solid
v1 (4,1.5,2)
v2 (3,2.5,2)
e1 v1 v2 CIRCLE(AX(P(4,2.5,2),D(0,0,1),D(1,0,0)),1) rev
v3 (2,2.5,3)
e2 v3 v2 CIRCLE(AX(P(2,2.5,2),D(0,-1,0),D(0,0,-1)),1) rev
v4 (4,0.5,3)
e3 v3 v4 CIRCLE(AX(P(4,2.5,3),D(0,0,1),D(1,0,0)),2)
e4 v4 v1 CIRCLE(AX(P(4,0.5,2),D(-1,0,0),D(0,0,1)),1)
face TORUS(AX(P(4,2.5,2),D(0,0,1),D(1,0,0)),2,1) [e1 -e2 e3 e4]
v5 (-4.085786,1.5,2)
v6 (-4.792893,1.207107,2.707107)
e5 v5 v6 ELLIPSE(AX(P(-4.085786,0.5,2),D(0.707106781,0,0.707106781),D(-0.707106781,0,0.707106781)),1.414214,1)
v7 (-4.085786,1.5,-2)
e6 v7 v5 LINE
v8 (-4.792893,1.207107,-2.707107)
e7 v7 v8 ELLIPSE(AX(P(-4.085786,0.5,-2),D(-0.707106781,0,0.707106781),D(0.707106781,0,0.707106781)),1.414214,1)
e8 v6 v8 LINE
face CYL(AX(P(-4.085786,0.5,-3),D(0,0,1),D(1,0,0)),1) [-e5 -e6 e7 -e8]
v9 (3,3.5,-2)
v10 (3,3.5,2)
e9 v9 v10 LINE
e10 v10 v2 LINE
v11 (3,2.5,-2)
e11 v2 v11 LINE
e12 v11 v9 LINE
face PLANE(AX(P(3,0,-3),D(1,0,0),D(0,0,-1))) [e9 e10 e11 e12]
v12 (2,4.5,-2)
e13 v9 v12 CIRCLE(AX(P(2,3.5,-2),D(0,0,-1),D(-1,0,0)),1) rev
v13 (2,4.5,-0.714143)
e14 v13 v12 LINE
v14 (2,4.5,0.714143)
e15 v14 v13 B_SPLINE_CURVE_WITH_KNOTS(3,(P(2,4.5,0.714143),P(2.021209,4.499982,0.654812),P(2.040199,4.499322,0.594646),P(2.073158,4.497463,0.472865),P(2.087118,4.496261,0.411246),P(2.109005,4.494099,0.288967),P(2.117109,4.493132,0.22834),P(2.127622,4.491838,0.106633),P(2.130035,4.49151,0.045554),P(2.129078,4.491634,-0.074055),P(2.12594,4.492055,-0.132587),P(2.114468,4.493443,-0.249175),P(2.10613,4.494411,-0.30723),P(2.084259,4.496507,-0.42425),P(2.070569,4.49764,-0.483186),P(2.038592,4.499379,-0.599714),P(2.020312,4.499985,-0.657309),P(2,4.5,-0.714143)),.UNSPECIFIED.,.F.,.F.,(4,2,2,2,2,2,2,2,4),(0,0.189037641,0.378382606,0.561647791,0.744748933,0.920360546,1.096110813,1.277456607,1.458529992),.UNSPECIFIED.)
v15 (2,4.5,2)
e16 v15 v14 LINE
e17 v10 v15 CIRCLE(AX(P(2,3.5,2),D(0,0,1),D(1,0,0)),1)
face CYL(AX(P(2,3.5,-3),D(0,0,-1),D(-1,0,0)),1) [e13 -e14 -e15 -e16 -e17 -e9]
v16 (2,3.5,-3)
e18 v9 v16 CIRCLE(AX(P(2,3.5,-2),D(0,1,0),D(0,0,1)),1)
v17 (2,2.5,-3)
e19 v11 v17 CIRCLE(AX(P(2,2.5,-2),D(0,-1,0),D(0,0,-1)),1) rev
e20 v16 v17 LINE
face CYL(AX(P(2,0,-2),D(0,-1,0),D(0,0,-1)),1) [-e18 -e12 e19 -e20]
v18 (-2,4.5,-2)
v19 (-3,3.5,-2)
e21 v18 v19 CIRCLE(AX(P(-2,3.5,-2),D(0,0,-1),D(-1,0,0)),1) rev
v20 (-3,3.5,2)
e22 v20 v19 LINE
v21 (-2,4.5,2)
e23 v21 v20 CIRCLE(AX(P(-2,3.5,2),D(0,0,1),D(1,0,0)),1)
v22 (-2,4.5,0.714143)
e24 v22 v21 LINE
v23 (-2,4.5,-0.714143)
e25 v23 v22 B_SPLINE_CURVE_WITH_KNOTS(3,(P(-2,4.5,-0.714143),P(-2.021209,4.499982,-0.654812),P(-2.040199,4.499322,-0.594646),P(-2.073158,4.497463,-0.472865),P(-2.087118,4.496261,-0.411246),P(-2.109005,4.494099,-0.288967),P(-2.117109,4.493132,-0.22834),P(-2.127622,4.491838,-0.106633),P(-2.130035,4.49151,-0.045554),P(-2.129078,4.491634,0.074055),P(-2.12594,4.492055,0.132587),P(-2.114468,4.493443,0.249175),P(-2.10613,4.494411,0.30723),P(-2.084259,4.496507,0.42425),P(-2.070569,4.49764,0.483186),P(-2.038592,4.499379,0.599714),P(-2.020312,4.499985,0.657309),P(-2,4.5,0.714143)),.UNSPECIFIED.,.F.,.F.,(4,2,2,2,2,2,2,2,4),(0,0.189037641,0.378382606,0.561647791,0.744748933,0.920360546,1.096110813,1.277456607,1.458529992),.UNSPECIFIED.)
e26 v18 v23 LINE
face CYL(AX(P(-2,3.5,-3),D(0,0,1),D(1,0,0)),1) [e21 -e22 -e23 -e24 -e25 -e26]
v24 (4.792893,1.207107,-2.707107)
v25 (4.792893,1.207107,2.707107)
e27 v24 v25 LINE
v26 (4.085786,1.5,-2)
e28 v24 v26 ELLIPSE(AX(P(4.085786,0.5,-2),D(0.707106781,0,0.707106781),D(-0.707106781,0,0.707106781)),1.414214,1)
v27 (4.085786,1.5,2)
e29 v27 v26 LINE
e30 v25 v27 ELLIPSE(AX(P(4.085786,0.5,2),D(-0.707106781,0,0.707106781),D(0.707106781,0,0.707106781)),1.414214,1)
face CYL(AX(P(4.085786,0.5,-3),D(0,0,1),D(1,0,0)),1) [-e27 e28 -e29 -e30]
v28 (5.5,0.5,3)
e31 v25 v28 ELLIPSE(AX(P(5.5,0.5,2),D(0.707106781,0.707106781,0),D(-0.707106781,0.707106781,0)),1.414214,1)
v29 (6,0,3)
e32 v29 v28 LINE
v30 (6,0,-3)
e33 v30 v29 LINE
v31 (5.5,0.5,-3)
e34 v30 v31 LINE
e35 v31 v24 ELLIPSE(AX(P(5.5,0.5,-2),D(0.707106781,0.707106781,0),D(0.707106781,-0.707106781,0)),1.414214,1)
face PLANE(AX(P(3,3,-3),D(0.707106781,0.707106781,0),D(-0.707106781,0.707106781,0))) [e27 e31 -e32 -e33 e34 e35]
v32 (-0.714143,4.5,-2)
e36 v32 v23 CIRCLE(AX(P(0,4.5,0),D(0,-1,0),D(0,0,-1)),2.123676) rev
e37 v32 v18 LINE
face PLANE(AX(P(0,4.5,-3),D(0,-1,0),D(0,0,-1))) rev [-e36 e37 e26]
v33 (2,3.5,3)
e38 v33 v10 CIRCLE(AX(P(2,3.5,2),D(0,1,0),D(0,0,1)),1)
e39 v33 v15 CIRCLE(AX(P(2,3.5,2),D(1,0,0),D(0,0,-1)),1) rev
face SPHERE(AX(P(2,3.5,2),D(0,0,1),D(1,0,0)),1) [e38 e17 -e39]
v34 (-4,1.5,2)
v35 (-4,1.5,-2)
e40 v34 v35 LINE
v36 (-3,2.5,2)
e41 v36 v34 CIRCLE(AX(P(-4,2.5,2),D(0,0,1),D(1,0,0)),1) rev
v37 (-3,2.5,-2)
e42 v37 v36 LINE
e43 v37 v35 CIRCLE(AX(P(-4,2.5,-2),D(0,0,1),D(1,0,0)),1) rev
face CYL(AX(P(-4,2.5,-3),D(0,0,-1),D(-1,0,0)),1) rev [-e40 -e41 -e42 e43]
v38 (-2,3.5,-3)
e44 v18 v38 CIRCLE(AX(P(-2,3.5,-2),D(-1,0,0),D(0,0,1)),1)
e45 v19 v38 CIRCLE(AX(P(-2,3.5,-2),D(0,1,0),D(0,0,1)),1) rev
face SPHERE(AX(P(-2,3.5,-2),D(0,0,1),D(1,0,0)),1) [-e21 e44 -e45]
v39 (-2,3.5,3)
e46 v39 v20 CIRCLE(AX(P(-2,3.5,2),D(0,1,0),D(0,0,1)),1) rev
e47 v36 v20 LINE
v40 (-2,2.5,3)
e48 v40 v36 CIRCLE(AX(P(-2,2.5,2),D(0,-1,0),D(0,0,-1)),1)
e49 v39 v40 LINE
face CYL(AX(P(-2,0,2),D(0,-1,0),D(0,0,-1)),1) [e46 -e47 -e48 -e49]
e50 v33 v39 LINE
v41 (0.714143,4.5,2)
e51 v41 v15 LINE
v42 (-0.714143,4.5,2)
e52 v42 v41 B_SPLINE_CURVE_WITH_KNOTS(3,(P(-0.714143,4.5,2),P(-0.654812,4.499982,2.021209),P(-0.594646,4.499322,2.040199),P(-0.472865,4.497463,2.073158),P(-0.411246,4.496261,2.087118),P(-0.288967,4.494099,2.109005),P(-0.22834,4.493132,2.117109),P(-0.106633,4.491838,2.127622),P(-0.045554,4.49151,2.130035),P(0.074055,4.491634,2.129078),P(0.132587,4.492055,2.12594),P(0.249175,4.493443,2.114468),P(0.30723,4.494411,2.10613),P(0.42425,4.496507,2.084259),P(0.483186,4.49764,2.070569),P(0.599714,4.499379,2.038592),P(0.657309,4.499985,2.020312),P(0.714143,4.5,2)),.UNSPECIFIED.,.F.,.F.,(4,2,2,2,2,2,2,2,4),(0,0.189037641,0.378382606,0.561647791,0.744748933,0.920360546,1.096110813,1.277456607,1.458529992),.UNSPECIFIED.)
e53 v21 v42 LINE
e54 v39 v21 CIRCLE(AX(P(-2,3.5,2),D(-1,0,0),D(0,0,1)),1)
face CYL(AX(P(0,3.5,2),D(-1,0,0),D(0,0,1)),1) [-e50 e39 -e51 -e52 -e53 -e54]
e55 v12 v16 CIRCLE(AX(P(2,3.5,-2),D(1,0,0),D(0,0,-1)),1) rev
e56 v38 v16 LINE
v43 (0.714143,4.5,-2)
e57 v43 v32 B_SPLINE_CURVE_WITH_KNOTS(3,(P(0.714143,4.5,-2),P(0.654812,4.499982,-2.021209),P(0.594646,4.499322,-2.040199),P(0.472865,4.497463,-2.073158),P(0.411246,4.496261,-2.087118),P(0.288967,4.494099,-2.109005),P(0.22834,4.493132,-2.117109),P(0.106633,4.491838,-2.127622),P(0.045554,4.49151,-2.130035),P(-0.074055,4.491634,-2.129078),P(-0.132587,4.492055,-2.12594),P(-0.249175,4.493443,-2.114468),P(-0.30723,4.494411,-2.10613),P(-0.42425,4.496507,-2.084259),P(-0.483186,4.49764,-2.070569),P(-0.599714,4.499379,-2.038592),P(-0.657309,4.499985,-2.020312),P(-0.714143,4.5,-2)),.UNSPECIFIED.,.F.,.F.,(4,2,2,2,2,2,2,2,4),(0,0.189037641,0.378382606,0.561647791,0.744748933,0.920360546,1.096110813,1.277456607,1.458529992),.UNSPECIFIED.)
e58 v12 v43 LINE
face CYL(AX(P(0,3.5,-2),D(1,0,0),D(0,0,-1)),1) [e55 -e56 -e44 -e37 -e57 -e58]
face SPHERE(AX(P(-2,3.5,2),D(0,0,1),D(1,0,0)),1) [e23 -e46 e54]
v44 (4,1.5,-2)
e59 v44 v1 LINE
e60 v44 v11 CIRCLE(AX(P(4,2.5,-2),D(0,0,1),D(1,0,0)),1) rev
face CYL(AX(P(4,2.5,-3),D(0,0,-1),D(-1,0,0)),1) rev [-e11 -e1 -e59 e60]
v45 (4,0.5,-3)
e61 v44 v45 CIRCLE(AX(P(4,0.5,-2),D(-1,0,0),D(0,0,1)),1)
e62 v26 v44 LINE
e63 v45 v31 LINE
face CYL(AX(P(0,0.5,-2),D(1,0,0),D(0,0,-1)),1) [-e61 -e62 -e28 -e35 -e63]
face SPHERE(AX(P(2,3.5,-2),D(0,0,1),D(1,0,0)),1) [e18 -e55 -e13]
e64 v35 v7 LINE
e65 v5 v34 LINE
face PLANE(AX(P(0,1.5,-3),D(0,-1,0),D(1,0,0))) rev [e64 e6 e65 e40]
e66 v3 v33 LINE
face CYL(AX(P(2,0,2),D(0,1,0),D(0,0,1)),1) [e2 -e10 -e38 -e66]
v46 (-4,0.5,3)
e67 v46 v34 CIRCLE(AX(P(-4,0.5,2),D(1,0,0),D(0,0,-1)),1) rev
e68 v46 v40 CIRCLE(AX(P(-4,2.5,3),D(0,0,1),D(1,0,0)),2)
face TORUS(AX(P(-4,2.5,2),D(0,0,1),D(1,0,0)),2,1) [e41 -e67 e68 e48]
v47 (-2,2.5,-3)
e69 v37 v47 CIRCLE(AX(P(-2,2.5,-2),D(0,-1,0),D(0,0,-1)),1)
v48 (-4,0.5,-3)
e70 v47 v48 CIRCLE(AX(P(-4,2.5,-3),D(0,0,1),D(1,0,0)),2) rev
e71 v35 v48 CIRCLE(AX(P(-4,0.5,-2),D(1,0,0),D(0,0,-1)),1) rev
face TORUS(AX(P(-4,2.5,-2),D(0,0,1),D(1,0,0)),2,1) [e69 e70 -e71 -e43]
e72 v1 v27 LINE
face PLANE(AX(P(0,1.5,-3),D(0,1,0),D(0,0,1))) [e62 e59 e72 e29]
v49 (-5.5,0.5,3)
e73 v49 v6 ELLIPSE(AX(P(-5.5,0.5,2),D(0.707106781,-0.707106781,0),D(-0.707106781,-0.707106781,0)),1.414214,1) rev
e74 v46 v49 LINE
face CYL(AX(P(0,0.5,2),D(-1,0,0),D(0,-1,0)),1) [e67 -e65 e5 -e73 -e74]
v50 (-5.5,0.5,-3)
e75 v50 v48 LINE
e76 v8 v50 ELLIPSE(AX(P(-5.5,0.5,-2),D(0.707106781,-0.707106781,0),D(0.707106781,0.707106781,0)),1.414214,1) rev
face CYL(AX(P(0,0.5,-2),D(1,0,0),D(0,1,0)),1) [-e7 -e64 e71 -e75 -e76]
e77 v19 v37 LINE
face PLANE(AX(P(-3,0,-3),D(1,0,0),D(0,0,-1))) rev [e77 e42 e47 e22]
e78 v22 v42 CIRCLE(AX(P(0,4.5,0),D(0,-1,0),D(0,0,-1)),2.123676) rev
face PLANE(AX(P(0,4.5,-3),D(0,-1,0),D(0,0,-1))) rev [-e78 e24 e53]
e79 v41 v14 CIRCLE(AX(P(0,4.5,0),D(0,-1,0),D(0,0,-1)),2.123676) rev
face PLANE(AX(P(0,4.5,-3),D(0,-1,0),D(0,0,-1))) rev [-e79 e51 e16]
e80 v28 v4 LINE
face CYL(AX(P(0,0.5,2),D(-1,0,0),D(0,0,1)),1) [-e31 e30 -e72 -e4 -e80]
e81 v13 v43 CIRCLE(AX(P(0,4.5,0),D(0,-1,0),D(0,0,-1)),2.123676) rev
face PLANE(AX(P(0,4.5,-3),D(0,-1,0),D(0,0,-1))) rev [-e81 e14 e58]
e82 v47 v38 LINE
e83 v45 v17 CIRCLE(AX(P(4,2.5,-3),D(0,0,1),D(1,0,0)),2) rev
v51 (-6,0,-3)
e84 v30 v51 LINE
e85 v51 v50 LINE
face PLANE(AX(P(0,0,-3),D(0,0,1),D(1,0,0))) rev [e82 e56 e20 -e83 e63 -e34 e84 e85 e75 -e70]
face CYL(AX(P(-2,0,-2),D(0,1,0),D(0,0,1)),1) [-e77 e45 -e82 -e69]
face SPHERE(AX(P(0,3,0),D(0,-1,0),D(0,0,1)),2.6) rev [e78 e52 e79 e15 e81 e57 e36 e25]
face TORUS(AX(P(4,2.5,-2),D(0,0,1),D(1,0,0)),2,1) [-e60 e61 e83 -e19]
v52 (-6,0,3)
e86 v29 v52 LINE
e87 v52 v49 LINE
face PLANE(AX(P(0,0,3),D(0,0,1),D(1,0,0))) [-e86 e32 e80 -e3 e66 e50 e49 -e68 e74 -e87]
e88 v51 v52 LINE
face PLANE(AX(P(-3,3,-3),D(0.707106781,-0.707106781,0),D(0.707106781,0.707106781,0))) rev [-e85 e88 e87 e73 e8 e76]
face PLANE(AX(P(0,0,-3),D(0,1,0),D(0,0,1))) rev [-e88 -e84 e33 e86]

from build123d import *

# Parameters (mm, degrees)
BOSS_EXTRUDE1_DEPTH      = 3
BOSS_EXTRUDE1_DEPTH_BACK = 3
FILLET1_R                = 1


with BuildPart() as part:
    # Sketch1 → Boss-Extrude1 (new, two sides: drawn at the far end of the back side and taken through both)
    with BuildSketch(Plane.XY.offset(-BOSS_EXTRUDE1_DEPTH_BACK)):
        Polygon((-6, 0), (0, 0), (0, 4.5), (-3, 4.5), (-3, 1.5), (-4.5, 1.5), align=None)
        Polygon((0, 0), (6, 0), (4.5, 1.5), (3, 1.5), (3, 4.5), (0, 4.5), align=None)
    extrude(amount=BOSS_EXTRUDE1_DEPTH + BOSS_EXTRUDE1_DEPTH_BACK)

    # Sketch2 → Cut-Revolve1 (revolve, cut)
    with BuildSketch(Plane(origin=(0, 0, 0), x_dir=(0, 0, -1), z_dir=(1, 0, 0))):
        with BuildLine():
            Line((0, 0.4), (0, 5.6))
            ThreePointArc((0, 5.6), (-2.6, 3), (0, 0.4))
        make_face()
    revolve(axis=Axis((0, 0.4, 0), (0, 1, 0)), mode=Mode.SUBTRACT)

    # Fillet1
    # the kernel refuses this fillet: 1 mm, written as the material it adds along each edge
    with BuildSketch(Plane(origin=(-3, 1.5, 3), x_dir=(-1, 0, 0), z_dir=(0, 0, -1)), Plane(origin=(3, 1.5, -3), x_dir=(1, 0, 0), z_dir=(0, 0, 1))) as fillet1_piece_1:
        with BuildLine():
            CenterArc((FILLET1_R, FILLET1_R), FILLET1_R, 180, 90)
            Line((0, FILLET1_R), (0, 0))
            Line((0, 0), (FILLET1_R, 0))
        make_face()
    extrude(amount=6)
    # the kernel refuses this fillet: 1 mm, written as the material it takes off along each edge
    with BuildSketch(Plane(origin=(-2, 3.5, -2), x_dir=(-1, 0, 0), z_dir=(0, 1, 0))) as fillet1_2_piece_1_section:
        Polygon((0, 0), (FILLET1_R, 0), (FILLET1_R, -FILLET1_R), (0, -FILLET1_R), align=None)
    fillet1_2_piece_1 = extrude(amount=FILLET1_R, mode=Mode.PRIVATE)
    fillet1_2_piece_1 = fillet1_2_piece_1 - Plane(origin=(-2, 3.5, -2), x_dir=(0.7071067811865475, 0, 0.7071067811865475), z_dir=(0, 1, 0)) * Sphere(FILLET1_R, mode=Mode.PRIVATE)
    add(fillet1_2_piece_1, mode=Mode.SUBTRACT)
    with BuildSketch(Plane(origin=(-2, 3.5, 2), x_dir=(-1, 0, 0), z_dir=(0, 1, 0))) as fillet1_2_piece_2_section:
        Polygon((0, 0), (FILLET1_R, 0), (FILLET1_R, FILLET1_R), (0, FILLET1_R), align=None)
    fillet1_2_piece_2 = extrude(amount=FILLET1_R, mode=Mode.PRIVATE)
    fillet1_2_piece_2 = fillet1_2_piece_2 - Plane(origin=(-2, 3.5, 2), x_dir=(0.7071067811865475, 0, -0.7071067811865475), z_dir=(0, 1, 0)) * Sphere(FILLET1_R, mode=Mode.PRIVATE)
    add(fillet1_2_piece_2, mode=Mode.SUBTRACT)
    with BuildSketch(Plane(origin=(2, 3.5, -2), x_dir=(0, 0, -1), z_dir=(0, 1, 0))) as fillet1_2_piece_3_section:
        Polygon((0, 0), (FILLET1_R, 0), (FILLET1_R, -FILLET1_R), (0, -FILLET1_R), align=None)
    fillet1_2_piece_3 = extrude(amount=FILLET1_R, mode=Mode.PRIVATE)
    fillet1_2_piece_3 = fillet1_2_piece_3 - Plane(origin=(2, 3.5, -2), x_dir=(-0.7071067811865475, 0, 0.7071067811865475), z_dir=(0, 1, 0)) * Sphere(FILLET1_R, mode=Mode.PRIVATE)
    add(fillet1_2_piece_3, mode=Mode.SUBTRACT)
    with BuildSketch(Plane(origin=(2, 3.5, 2), x_dir=(0, 0, 1), z_dir=(0, 1, 0))) as fillet1_2_piece_4_section:
        Polygon((0, 0), (FILLET1_R, 0), (FILLET1_R, FILLET1_R), (0, FILLET1_R), align=None)
    fillet1_2_piece_4 = extrude(amount=FILLET1_R, mode=Mode.PRIVATE)
    fillet1_2_piece_4 = fillet1_2_piece_4 - Plane(origin=(2, 3.5, 2), x_dir=(-0.7071067811865475, 0, -0.7071067811865475), z_dir=(0, 1, 0)) * Sphere(FILLET1_R, mode=Mode.PRIVATE)
    add(fillet1_2_piece_4, mode=Mode.SUBTRACT)
    with BuildSketch(Plane(origin=(7, 1.5, -3), x_dir=(0, -1, 0), z_dir=(-1, 0, 0)), Plane(origin=(-4, 1.5, -3), x_dir=(0, -1, 0), z_dir=(-1, 0, 0))) as fillet1_2_piece_5:
        with BuildLine():
            CenterArc((FILLET1_R, FILLET1_R), FILLET1_R, 180, 90)
            Line((0, FILLET1_R), (0, 0))
            Line((0, 0), (FILLET1_R, 0))
        make_face()
    extrude(amount=3, mode=Mode.SUBTRACT)
    with BuildSketch(Plane(origin=(-4.5, 1.5, 4.035533906), x_dir=(-0.7071067811865516, -0.7071067811865435, 0), z_dir=(0, 0, -1)), Plane(origin=(4.5, 1.5, -4.035533906), x_dir=(0.707106781186551, -0.707106781186544, 0), z_dir=(0, 0, 1))) as fillet1_2_piece_6:
        with BuildLine():
            CenterArc((FILLET1_R * 0.414213562373, -FILLET1_R), FILLET1_R, 90, 45)
            Line((-FILLET1_R * 0.292893218813, -FILLET1_R * 0.292893218813), (0, 0))
            Line((0, 0), (FILLET1_R * 0.414213562373, 0))
        make_face()
    extrude(amount=8.071067812, mode=Mode.SUBTRACT)
    with BuildSketch(Plane(origin=(-3, 4.5, -2), x_dir=(1, 0, 0), z_dir=(0, 0, 1)), Plane(origin=(3, 4.5, -2), x_dir=(0, -1, 0), z_dir=(0, 0, 1)), Plane(origin=(-2, 4.5, -3), x_dir=(0, -1, 0), z_dir=(1, 0, 0)), Plane(origin=(2, 4.5, 3), x_dir=(0, -1, 0), z_dir=(-1, 0, 0))) as fillet1_2_piece_7:
        with BuildLine():
            CenterArc((FILLET1_R, -FILLET1_R), FILLET1_R, 90, 90)
            Line((0, -FILLET1_R), (0, 0))
            Line((0, 0), (FILLET1_R, 0))
        make_face()
    extrude(amount=4, mode=Mode.SUBTRACT)
    with BuildSketch(Plane(origin=(3, 2.5, -3), x_dir=(-1, 0, 0), z_dir=(0, 1, 0)), Plane(origin=(-3, 3.5, -3), x_dir=(1, 0, 0), z_dir=(0, -1, 0))) as fillet1_2_piece_8:
        with BuildLine():
            CenterArc((FILLET1_R, FILLET1_R), FILLET1_R, 180, 90)
            Line((0, FILLET1_R), (0, 0))
            Line((0, 0), (FILLET1_R, 0))
        make_face()
    extrude(amount=1, mode=Mode.SUBTRACT)
    with BuildSketch(Plane(origin=(-3, 3.5, 3), x_dir=(1, 0, 0), z_dir=(0, -1, 0)), Plane(origin=(3, 2.5, 3), x_dir=(-1, 0, 0), z_dir=(0, 1, 0))) as fillet1_2_piece_9:
        with BuildLine():
            CenterArc((FILLET1_R, -FILLET1_R), FILLET1_R, 90, 90)
            Line((0, -FILLET1_R), (0, 0))
            Line((0, 0), (FILLET1_R, 0))
        make_face()
    extrude(amount=1, mode=Mode.SUBTRACT)
    with BuildSketch(Plane(origin=(-4, 1.5, 3), x_dir=(0, -1, 0), z_dir=(-1, 0, 0)), Plane(origin=(7, 1.5, 3), x_dir=(0, -1, 0), z_dir=(-1, 0, 0))) as fillet1_2_piece_10:
        with BuildLine():
            CenterArc((FILLET1_R, -FILLET1_R), FILLET1_R, 90, 90)
            Line((0, -FILLET1_R), (0, 0))
            Line((0, 0), (FILLET1_R, 0))
        make_face()
    extrude(amount=3, mode=Mode.SUBTRACT)
    with BuildSketch(Plane(origin=(-4, 2.5, -3), x_dir=(0, -1, 0), z_dir=(-1, 0, 0))) as fillet1_2_piece_11:
        with BuildLine():
            CenterArc((1 + FILLET1_R, FILLET1_R), FILLET1_R, 180, 90)
            Line((1, FILLET1_R), (1, 0))
            Line((1, 0), (1 + FILLET1_R, 0))
        make_face()
    revolve(axis=Axis((-4, 2.5, -3), (0, 0, 1)), revolution_arc=90, mode=Mode.SUBTRACT)
    with BuildSketch(Plane(origin=(4, 2.5, 3), x_dir=(0, -1, 0), z_dir=(1, 0, 0))) as fillet1_2_piece_12:
        with BuildLine():
            CenterArc((1 + FILLET1_R, FILLET1_R), FILLET1_R, 180, 90)
            Line((1, FILLET1_R), (1, 0))
            Line((1, 0), (1 + FILLET1_R, 0))
        make_face()
    revolve(axis=Axis((4, 2.5, 3), (0, 0, -1)), revolution_arc=90, mode=Mode.SUBTRACT)
    with BuildSketch(Plane(origin=(-4, 2.5, 3), x_dir=(0, -1, 0), z_dir=(-1, 0, 0))) as fillet1_2_piece_13:
        with BuildLine():
            CenterArc((1 + FILLET1_R, -FILLET1_R), FILLET1_R, 90, 90)
            Line((1, -FILLET1_R), (1, 0))
            Line((1, 0), (1 + FILLET1_R, 0))
        make_face()
    revolve(axis=Axis((-4, 2.5, 3), (0, 0, 1)), revolution_arc=90, mode=Mode.SUBTRACT)
    with BuildSketch(Plane(origin=(4, 2.5, -3), x_dir=(0, -1, 0), z_dir=(1, 0, 0))) as fillet1_2_piece_14:
        with BuildLine():
            CenterArc((1 + FILLET1_R, -FILLET1_R), FILLET1_R, 90, 90)
            Line((1, -FILLET1_R), (1, 0))
            Line((1, 0), (1 + FILLET1_R, 0))
        make_face()
    revolve(axis=Axis((4, 2.5, -3), (0, 0, -1)), revolution_arc=90, mode=Mode.SUBTRACT)


solid = part.part
